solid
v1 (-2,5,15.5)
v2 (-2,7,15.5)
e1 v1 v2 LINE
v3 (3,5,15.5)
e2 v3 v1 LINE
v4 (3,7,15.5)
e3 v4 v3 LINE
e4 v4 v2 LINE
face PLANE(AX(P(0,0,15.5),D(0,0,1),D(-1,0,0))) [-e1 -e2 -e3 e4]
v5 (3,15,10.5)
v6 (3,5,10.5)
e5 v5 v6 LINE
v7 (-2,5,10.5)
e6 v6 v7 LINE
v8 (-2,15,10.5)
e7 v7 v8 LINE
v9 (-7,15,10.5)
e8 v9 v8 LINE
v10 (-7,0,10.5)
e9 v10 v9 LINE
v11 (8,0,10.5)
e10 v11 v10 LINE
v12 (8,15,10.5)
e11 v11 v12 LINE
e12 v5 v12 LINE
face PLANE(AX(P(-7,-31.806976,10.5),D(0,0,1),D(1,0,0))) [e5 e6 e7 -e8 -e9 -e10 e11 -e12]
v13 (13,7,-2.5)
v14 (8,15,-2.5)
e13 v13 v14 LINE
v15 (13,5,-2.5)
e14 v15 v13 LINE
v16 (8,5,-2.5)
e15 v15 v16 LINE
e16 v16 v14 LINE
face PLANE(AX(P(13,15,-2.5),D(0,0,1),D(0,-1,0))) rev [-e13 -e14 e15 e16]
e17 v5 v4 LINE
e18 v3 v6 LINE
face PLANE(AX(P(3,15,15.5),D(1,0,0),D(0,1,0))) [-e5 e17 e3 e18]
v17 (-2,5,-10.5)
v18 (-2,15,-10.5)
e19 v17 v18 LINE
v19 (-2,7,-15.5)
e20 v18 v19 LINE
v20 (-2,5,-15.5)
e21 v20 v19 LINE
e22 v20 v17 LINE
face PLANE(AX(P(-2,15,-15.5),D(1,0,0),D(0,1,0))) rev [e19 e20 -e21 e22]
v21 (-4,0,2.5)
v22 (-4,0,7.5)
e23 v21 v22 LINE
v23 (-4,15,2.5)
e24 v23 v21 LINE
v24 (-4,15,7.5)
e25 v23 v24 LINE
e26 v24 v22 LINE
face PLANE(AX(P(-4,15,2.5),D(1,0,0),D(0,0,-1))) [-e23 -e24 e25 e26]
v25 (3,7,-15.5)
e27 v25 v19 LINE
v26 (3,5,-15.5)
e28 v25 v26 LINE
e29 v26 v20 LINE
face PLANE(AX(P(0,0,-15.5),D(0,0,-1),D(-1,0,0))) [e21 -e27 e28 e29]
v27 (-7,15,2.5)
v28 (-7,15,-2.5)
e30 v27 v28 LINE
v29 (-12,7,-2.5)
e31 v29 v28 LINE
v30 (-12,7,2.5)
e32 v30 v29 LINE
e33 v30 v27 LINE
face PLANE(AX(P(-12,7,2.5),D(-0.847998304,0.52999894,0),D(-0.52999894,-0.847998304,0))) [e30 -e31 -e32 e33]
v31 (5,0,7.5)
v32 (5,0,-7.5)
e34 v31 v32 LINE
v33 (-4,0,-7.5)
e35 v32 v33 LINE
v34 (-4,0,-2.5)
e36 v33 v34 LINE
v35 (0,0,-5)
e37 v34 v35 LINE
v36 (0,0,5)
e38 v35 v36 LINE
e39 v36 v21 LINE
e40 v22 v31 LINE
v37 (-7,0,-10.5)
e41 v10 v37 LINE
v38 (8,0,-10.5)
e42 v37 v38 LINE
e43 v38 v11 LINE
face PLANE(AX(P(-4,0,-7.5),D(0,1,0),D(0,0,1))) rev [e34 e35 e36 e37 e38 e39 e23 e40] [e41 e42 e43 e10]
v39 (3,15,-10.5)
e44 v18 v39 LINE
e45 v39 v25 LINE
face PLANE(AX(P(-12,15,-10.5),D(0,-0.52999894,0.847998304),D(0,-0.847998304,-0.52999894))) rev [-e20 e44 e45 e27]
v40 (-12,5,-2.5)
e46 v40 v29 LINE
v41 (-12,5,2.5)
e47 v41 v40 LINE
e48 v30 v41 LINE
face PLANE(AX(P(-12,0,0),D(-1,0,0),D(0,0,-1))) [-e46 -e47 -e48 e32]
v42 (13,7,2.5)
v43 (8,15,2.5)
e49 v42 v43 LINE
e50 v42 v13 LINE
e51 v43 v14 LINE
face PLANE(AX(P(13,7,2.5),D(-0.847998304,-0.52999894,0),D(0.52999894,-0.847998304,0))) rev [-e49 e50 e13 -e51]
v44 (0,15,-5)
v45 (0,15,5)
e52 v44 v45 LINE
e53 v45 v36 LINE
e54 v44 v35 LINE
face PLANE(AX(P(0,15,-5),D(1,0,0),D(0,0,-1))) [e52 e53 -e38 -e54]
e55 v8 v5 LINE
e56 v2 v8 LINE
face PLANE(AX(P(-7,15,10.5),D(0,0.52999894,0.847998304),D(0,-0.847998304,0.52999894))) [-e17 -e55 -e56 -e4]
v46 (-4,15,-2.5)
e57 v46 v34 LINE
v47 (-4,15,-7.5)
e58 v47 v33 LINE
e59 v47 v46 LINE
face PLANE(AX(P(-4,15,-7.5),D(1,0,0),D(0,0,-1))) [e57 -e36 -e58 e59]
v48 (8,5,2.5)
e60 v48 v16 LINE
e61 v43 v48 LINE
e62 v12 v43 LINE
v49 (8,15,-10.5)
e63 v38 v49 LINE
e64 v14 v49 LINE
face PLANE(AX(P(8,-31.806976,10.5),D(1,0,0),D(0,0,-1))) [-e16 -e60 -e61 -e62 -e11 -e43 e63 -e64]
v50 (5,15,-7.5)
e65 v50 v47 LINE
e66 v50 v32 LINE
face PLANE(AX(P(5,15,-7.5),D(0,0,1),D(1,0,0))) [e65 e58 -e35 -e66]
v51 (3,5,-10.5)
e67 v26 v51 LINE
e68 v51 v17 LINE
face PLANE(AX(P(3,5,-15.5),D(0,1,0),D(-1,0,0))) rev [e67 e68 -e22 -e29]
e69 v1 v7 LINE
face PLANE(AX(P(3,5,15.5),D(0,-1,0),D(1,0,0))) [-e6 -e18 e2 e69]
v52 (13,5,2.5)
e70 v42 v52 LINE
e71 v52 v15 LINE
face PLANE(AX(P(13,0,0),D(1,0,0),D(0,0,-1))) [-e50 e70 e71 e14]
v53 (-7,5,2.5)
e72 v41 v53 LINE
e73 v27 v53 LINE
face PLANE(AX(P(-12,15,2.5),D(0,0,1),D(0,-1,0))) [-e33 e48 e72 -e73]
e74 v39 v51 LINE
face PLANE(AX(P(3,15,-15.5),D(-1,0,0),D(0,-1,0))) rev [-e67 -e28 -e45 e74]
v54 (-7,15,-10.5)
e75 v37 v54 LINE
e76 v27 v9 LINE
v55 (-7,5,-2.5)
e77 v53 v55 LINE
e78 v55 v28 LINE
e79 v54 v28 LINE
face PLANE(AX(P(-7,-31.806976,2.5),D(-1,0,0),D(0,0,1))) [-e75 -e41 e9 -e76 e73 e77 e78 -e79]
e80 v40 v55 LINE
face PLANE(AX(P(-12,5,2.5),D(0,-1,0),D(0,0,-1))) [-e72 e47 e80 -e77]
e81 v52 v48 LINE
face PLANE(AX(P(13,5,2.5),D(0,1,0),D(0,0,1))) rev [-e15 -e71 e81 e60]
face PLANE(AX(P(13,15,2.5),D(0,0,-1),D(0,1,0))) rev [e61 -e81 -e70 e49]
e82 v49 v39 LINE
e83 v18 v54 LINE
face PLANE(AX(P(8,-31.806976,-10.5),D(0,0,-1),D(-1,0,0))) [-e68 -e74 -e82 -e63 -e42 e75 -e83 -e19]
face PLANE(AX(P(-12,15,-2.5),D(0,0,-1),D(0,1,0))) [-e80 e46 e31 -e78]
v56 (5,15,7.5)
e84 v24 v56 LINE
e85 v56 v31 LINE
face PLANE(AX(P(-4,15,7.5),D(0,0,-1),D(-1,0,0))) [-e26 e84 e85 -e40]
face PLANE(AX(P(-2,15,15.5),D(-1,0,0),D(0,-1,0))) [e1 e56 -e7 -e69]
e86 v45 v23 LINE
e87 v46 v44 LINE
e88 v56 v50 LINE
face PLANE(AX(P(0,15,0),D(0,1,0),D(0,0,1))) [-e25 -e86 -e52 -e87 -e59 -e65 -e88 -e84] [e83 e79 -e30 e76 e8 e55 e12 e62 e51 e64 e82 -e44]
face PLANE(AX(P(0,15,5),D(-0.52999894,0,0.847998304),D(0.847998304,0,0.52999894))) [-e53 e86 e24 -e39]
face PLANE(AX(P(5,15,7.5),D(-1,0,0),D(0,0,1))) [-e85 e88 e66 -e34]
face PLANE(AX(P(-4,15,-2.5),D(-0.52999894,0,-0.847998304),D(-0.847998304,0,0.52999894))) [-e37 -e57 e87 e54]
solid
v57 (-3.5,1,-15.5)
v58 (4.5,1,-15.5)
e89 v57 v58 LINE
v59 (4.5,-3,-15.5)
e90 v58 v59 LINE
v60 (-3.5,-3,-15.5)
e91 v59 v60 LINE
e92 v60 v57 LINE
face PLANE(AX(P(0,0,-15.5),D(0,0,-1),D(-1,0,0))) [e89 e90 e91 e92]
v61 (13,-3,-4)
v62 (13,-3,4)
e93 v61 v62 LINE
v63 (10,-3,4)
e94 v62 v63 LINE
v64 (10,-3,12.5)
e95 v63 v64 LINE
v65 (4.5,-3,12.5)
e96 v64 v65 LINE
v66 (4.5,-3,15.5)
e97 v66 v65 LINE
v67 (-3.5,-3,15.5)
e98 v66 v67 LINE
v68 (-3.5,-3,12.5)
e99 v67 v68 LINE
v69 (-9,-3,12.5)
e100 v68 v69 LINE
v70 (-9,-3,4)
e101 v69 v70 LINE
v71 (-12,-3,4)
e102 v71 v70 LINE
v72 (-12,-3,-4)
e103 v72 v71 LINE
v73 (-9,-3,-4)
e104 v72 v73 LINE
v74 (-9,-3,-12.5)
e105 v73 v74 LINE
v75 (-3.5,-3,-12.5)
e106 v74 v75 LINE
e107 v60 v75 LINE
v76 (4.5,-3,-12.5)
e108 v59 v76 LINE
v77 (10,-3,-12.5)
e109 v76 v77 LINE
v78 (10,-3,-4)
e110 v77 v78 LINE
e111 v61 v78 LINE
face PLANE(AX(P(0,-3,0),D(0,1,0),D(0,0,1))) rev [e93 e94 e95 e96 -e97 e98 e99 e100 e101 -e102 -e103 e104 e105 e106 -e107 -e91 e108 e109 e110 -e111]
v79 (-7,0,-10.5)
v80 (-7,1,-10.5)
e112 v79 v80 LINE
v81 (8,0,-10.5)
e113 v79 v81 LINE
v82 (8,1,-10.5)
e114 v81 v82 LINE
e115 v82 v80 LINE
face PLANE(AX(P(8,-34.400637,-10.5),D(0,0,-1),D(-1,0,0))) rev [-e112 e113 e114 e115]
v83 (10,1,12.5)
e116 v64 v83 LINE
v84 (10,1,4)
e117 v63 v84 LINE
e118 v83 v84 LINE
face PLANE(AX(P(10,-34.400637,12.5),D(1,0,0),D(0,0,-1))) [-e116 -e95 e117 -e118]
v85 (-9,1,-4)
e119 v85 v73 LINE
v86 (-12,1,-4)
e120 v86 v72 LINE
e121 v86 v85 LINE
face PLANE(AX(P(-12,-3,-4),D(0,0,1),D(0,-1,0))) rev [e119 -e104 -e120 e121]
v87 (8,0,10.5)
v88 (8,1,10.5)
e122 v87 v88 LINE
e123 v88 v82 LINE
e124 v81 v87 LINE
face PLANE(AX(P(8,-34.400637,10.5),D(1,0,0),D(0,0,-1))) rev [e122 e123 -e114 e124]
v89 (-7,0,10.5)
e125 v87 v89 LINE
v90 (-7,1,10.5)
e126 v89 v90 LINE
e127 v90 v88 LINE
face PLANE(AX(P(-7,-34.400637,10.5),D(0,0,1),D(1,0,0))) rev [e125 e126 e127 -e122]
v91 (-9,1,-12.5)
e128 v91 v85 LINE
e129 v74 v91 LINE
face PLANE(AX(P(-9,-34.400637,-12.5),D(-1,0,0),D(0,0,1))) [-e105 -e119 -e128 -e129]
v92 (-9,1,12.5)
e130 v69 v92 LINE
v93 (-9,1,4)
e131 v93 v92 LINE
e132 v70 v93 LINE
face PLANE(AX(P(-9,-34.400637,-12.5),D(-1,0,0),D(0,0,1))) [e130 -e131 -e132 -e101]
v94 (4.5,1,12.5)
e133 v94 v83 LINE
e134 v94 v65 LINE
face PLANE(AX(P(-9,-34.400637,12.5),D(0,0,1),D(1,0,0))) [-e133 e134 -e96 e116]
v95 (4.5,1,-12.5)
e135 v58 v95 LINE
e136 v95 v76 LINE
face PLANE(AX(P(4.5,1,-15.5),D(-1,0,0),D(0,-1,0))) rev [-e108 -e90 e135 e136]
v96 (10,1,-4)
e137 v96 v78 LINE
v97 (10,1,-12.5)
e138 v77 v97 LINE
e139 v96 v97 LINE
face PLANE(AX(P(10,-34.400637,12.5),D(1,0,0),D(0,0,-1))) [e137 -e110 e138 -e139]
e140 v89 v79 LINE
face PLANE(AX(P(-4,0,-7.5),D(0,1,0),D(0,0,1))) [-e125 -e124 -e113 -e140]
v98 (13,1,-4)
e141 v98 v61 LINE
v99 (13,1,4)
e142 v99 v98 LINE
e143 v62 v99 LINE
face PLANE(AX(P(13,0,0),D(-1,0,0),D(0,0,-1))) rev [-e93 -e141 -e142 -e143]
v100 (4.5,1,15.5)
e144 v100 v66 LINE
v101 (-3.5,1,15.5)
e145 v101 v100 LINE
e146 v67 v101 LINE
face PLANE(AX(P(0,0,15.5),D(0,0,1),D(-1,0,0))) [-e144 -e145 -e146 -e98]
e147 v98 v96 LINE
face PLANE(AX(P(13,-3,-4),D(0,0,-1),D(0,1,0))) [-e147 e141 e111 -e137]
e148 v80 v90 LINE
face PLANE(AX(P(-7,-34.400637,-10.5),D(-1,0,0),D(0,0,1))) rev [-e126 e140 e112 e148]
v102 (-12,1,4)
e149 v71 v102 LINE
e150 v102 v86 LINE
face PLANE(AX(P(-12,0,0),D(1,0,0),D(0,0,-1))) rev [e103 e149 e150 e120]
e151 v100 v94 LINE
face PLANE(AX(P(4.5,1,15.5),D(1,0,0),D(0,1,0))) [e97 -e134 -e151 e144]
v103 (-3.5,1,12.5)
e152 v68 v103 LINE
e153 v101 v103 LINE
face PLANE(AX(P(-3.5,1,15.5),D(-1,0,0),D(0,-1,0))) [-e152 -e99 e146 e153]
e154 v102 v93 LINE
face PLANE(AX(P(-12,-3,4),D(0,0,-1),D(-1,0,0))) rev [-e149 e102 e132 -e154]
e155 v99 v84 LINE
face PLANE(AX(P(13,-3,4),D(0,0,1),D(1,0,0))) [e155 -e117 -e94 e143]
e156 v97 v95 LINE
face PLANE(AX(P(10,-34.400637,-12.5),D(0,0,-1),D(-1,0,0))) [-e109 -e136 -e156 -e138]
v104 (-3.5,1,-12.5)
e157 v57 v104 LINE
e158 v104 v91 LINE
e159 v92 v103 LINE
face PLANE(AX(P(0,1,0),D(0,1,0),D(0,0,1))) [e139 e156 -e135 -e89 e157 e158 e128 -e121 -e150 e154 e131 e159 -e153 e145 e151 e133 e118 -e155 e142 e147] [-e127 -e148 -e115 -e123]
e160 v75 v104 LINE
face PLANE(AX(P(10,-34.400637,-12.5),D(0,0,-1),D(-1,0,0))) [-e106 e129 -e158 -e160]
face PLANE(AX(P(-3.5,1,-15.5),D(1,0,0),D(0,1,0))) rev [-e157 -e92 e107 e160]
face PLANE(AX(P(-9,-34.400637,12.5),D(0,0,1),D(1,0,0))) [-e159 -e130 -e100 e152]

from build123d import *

# Parameters (mm, degrees)
BOSS_EXTRUDE1_DEPTH      = 15
BOSS_EXTRUDE2_DEPTH      = 18
BOSS_EXTRUDE3_DEPTH      = 1
BOSS_EXTRUDE3_DEPTH_BACK = 3
SKETCH3_W                = 19
SKETCH3_H                = 25
SKETCH3_W_2              = 15
SKETCH3_H_2              = 21
SKETCH4_W                = 8
SKETCH4_H                = 4
BOSS_EXTRUDE4_DEPTH      = 3
SKETCH5_W                = 8
SKETCH5_H                = 4
BOSS_EXTRUDE5_DEPTH      = 3
SKETCH6_W                = 5
SKETCH6_H                = 10
BOSS_EXTRUDE6_DEPTH      = 5
CUT_EXTRUDE1_DEPTH       = 27.272609311
SKETCH8_W                = 5
SKETCH8_H                = 10
BOSS_EXTRUDE7_DEPTH      = 5
CUT_EXTRUDE2_DEPTH       = 5


# Read off the part's stored shape, not the designer's step: Split1
with BuildPart() as part:
    # Sketch1 → Boss-Extrude1 (new body)
    with BuildSketch(Plane(origin=(0, 0, 0), x_dir=(1, 0, 0), z_dir=(0, 1, 0))):
        Polygon((-4, 7.5), (-4, 2.5), (0, 5), (0, -5), (-4, -2.5), (-4, -7.5), (5, -7.5), (5, 7.5), align=None)
    extrude(amount=BOSS_EXTRUDE1_DEPTH)


with BuildPart() as body_2:
    # Sketch2 → Boss-Extrude2 (new body)
    with BuildSketch(Plane(origin=(0, 15, 0), x_dir=(1, 0, 0), z_dir=(0, 1, 0))):
        Polygon((-7, 2.5), (-7, -2.5), (-7, -10.5), (8, -10.5), (8, 10.5), (-7, 10.5), align=None)
    extrude(amount=-BOSS_EXTRUDE2_DEPTH)

    # Combine3: cut part
    add(part.part, mode=Mode.SUBTRACT)


with BuildPart() as body_2_2:
    # Split1: the piece on the far side of the plane
    add(body_2.part)
    split(bisect_by=Plane(origin=(0, 0, 0), x_dir=(1, 0, 0), z_dir=(0, 1, 0)), keep=Keep.BOTTOM)

    # Sketch3 → Boss-Extrude3 (add, two sides: drawn at the far end of the back side and taken through both)
    with BuildSketch(Plane(origin=(0, 0, 0), x_dir=(1, 0, 0), z_dir=(0, 1, 0)).offset(-BOSS_EXTRUDE3_DEPTH_BACK)):
        with Locations((0.5, 0)):
            Rectangle(SKETCH3_W, SKETCH3_H)
        with Locations((0.5, 0)):
            Rectangle(SKETCH3_W_2, SKETCH3_H_2, mode=Mode.SUBTRACT)
    extrude(amount=BOSS_EXTRUDE3_DEPTH + BOSS_EXTRUDE3_DEPTH_BACK)

    # Sketch4 → Boss-Extrude4 (add)
    with BuildSketch(Plane(origin=(0, 0, -12.5), x_dir=(-1, 0, 0), z_dir=(0, 0, -1))):
        with Locations((-0.5, -1)):
            Rectangle(SKETCH4_W, SKETCH4_H)
    boss_extrude4 = extrude(amount=BOSS_EXTRUDE4_DEPTH)

    # Mirror1: Boss-Extrude4 across plane
    add(boss_extrude4.mirror(Plane.XY))

    # Sketch5 → Boss-Extrude5 (add)
    with BuildSketch(Plane.ZY.offset(9)):
        with Locations((0, -1)):
            Rectangle(SKETCH5_W, SKETCH5_H)
    boss_extrude5 = extrude(amount=BOSS_EXTRUDE5_DEPTH)

    # Mirror2: Boss-Extrude5 across plane
    add(boss_extrude5.mirror(Plane(origin=(0.5, 0, 0), x_dir=(0, 0, 1), z_dir=(1, 0, 0))))


with BuildPart() as body_2_1:
    add(body_2.part)

    # Split1
    split(bisect_by=Plane(origin=(0, 0, 0), x_dir=(1, 0, 0), z_dir=(0, 1, 0)), keep=Keep.TOP)

    # Sketch6 → Boss-Extrude6 (add)
    with BuildSketch(Plane(origin=(0, 0, -10.5), x_dir=(-1, 0, 0), z_dir=(0, 0, -1))):
        with Locations((-0.5, 10)):
            Rectangle(SKETCH6_W, SKETCH6_H)
    boss_extrude6 = extrude(amount=BOSS_EXTRUDE6_DEPTH)

    # Sketch7 → Cut-Extrude1 (cut, through all)
    with BuildSketch(Plane(origin=(3, 0, 0), x_dir=(0, 0, -1), z_dir=(1, 0, 0))):
        Polygon((10.5, 15), (15.5, 7), (15.5, 15), align=None)
    cut_extrude1 = extrude(amount=-CUT_EXTRUDE1_DEPTH, mode=Mode.SUBTRACT)

    # Mirror3: Boss-Extrude6, Cut-Extrude1 across plane
    add(boss_extrude6.mirror(Plane.XY))
    add(cut_extrude1.mirror(Plane.XY), mode=Mode.SUBTRACT)

    # Sketch8 → Boss-Extrude7 (add)
    with BuildSketch(Plane(origin=(8, 0, 0), x_dir=(0, 0, -1), z_dir=(1, 0, 0))):
        with Locations((0, 10)):
            Rectangle(SKETCH8_W, SKETCH8_H)
    boss_extrude7 = extrude(amount=BOSS_EXTRUDE7_DEPTH)

    # Sketch9 → Cut-Extrude2 (cut)
    with BuildSketch(Plane(origin=(0, 0, -2.5), x_dir=(-1, 0, 0), z_dir=(0, 0, -1))):
        Polygon((-13, 15), (-13, 7), (-8, 15), align=None)
    cut_extrude2 = extrude(amount=-CUT_EXTRUDE2_DEPTH, mode=Mode.SUBTRACT)

    # Mirror4: Boss-Extrude7, Cut-Extrude2 across plane
    add(boss_extrude7.mirror(Plane(origin=(0.5, 0, 0), x_dir=(0, 0, 1), z_dir=(1, 0, 0))))
    add(cut_extrude2.mirror(Plane(origin=(0.5, 0, 0), x_dir=(0, 0, 1), z_dir=(1, 0, 0))), mode=Mode.SUBTRACT)


solid = Compound([body_2_2.part, body_2_1.part])
